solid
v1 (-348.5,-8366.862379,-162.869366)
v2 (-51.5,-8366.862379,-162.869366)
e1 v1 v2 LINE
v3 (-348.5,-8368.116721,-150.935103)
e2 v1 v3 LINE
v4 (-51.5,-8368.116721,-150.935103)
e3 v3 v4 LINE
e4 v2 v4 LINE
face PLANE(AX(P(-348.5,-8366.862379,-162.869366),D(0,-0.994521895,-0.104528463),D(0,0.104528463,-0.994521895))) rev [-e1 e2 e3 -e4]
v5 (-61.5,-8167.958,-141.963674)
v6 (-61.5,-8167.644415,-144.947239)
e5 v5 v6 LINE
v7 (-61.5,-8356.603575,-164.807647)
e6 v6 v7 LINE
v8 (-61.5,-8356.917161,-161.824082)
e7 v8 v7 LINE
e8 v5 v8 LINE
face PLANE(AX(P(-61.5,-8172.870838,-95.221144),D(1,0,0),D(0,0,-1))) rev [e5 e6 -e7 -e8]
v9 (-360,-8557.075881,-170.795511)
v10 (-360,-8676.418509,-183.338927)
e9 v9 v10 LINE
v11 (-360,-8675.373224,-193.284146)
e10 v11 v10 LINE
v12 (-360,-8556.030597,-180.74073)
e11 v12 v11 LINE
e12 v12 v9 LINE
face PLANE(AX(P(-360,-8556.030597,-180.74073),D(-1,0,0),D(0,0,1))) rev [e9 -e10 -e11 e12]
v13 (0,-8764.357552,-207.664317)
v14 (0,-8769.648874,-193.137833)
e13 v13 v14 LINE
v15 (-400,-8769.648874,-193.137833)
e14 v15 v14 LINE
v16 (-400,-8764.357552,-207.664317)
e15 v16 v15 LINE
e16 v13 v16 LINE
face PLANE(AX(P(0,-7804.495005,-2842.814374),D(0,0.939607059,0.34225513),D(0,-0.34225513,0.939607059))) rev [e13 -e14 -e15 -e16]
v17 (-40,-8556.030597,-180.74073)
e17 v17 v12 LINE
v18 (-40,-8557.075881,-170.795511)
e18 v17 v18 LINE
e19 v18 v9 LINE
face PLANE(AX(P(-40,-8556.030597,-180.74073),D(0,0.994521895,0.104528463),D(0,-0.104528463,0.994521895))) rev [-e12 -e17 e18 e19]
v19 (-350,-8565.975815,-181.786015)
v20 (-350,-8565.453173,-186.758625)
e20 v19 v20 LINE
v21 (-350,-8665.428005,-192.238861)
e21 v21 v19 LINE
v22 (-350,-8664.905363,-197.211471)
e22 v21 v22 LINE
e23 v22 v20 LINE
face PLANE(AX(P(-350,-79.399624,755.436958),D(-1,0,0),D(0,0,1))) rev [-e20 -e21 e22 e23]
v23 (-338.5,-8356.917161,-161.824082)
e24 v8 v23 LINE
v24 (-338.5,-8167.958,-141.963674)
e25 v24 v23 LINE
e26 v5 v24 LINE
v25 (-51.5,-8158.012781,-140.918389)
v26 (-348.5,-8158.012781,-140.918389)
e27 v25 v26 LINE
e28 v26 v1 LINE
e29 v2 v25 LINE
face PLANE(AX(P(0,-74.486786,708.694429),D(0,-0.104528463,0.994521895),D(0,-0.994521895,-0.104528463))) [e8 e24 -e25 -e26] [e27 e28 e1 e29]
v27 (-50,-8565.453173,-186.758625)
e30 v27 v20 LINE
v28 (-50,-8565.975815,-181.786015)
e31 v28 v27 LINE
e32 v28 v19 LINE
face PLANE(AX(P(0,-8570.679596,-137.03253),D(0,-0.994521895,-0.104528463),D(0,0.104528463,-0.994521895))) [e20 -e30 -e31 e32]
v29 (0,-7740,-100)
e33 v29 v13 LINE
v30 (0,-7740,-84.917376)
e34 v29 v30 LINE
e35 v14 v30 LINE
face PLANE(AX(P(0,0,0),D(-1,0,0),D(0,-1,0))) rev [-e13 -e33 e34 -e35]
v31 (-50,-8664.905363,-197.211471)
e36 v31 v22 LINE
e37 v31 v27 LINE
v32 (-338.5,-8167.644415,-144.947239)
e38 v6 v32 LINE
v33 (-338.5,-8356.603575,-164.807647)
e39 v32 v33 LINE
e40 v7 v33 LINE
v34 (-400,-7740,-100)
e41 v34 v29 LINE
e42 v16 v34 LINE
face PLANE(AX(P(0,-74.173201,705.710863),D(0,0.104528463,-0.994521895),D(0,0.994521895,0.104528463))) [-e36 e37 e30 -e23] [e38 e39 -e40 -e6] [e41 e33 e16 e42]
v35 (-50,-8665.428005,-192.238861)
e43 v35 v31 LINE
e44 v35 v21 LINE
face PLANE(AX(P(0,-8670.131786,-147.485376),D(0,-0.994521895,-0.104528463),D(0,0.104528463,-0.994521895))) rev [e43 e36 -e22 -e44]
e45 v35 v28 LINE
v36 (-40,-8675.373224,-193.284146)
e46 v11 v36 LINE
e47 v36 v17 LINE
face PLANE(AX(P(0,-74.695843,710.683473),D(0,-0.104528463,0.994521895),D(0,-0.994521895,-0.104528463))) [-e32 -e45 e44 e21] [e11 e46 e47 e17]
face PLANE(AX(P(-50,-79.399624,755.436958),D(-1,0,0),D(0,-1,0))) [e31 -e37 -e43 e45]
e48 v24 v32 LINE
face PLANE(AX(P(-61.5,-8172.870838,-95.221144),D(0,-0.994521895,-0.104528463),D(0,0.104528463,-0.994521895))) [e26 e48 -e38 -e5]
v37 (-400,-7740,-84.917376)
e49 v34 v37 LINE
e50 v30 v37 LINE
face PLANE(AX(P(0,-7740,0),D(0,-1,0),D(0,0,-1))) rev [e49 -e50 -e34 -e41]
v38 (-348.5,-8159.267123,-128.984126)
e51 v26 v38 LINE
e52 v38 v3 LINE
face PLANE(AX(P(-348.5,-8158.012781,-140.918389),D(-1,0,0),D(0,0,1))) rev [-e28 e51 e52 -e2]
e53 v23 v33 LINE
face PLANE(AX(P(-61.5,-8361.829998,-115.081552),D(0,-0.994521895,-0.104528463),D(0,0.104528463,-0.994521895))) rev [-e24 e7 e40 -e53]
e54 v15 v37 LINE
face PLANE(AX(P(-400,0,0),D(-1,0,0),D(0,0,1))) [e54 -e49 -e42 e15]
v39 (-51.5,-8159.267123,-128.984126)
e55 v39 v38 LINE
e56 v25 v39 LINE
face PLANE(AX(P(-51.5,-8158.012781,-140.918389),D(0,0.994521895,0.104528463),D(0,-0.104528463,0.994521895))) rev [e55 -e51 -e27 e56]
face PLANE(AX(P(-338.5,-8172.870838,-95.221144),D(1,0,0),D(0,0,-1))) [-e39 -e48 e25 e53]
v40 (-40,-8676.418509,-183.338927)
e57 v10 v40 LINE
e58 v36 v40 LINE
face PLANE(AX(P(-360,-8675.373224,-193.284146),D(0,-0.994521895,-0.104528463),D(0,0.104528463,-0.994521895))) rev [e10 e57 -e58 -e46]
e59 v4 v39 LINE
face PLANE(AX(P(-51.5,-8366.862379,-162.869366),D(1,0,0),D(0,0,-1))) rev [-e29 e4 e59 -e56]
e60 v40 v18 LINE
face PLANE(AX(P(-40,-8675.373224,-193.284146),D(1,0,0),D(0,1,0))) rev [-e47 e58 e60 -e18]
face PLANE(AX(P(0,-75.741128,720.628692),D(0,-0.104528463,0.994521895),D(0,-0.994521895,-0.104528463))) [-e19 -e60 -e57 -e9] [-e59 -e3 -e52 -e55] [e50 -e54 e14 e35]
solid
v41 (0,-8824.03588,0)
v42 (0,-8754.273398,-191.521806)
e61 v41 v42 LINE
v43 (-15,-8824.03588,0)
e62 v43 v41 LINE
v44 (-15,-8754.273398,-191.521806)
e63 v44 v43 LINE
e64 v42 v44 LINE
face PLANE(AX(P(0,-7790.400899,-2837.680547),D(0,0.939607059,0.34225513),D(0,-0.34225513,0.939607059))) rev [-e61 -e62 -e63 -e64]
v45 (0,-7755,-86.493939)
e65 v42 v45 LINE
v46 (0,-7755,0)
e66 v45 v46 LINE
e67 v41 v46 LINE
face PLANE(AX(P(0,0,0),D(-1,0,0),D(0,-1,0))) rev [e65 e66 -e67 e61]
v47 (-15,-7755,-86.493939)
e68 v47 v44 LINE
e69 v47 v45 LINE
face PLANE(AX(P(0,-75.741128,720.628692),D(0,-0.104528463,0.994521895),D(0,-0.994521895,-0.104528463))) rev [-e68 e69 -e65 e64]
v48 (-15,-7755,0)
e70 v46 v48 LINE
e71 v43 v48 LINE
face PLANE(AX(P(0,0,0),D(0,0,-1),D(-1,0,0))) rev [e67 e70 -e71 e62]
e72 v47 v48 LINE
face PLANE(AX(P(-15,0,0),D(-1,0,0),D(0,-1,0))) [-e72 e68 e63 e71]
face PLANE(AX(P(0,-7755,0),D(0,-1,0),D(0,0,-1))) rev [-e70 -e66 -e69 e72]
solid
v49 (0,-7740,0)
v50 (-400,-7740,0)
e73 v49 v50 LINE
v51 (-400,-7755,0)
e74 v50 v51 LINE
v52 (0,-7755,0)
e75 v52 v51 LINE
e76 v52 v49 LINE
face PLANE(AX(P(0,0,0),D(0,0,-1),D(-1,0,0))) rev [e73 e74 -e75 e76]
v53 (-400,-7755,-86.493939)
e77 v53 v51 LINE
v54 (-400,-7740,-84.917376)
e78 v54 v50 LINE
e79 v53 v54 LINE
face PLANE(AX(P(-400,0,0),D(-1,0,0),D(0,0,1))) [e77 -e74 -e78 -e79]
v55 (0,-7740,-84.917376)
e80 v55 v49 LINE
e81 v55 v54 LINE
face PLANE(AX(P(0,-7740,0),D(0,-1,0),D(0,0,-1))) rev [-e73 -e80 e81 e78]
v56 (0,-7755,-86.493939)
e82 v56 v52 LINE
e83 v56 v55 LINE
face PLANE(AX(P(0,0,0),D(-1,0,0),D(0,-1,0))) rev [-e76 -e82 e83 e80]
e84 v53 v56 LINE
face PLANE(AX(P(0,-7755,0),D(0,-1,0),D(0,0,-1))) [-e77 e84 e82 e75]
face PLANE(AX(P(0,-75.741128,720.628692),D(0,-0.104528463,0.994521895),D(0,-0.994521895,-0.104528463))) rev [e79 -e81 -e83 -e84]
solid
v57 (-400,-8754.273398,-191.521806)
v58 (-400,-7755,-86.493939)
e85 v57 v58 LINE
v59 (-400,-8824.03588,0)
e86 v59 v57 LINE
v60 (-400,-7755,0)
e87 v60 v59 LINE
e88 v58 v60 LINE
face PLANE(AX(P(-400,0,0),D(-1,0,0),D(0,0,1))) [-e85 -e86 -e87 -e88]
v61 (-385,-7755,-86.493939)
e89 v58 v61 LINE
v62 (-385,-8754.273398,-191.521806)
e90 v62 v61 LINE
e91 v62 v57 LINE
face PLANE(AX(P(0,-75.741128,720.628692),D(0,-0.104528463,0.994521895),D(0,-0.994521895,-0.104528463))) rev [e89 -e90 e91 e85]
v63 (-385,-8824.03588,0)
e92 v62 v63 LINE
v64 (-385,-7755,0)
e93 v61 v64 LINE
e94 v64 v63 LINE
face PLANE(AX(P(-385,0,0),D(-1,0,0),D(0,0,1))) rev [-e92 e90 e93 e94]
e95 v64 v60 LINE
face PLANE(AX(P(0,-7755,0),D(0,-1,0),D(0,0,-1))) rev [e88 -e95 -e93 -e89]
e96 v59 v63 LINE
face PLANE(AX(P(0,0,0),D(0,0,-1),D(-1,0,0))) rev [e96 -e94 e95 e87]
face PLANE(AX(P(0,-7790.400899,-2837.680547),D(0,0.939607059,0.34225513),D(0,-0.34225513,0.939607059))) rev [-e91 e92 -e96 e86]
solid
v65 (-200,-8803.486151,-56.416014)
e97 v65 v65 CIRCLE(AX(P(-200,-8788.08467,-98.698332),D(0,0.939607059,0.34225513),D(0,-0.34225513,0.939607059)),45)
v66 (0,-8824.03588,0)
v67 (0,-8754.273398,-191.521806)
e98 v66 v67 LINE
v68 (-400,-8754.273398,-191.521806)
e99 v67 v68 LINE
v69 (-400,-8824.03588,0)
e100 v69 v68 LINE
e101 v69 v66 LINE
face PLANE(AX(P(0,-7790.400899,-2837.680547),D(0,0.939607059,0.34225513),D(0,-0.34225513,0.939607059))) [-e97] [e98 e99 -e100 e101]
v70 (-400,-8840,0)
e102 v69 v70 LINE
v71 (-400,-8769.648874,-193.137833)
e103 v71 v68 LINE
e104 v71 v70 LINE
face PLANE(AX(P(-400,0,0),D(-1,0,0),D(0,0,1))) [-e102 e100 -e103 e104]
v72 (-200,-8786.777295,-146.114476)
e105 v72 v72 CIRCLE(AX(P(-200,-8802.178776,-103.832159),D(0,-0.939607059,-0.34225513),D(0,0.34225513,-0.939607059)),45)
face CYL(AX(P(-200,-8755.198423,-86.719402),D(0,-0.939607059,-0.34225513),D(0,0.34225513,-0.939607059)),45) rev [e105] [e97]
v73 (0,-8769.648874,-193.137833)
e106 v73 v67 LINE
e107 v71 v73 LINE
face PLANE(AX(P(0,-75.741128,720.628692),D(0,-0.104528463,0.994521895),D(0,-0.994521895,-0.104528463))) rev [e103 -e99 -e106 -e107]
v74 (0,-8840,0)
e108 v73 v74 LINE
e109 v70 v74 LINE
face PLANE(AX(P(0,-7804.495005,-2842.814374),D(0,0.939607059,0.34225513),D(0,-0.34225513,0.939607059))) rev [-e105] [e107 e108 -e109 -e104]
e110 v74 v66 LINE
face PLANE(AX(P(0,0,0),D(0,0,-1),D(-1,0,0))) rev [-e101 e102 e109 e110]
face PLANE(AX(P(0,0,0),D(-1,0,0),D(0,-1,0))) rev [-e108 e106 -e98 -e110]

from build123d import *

# Parameters (mm, degrees)
SKETCH6_W          = 300
SKETCH6_H          = 100
SKETCH6_W_2        = 277
SKETCH6_H_2        = 190
CUT_EXTRUDE1_DEPTH = 50
SHELL1_T           = -15
SKETCH7_R          = 45
CUT_EXTRUDE2_DEPTH = 50
SPLIT3_START       = -400
SPLIT3_DEPTH       = 154.9999999
SPLIT3_START_2     = -154.9999999
SPLIT3_2_DEPTH     = 154.9999999
SPLIT3_START_3     = -245.0000001
SPLIT3_3_DEPTH     = 90.0000002
SPLIT3_START_4     = -8306.126404087
SPLIT3_4_OUTLINE_R = 45
SPLIT3_4_DEPTH     = 15
SPLIT3_5_DEPTH     = 385
SPLIT3_6_DEPTH     = 155.9999999
SPLIT3_7_DEPTH     = 15
SPLIT3_8_DEPTH     = 400
SKETCH9_W          = 297
SKETCH9_H          = 210
CUT_EXTRUDE3_DEPTH = 12
SKETCH10_W         = 320
SKETCH10_H         = 120
CUT_EXTRUDE4_DEPTH = 10


with BuildPart() as part:
    # Sketch4 → Loft1 section 0
    with BuildSketch(Plane(origin=(0, -74.173200619, 705.710863428), x_dir=(1, 0, 0), z_dir=(0, 0.10452846326765355, -0.9945218953682733))):
        with BuildLine():
            Line((0, 7708.052316477), (-400, 7708.052316477))
            Line((-400, 7708.052316477), (-400, 8738.052316477))
            Line((-400, 8738.052316477), (0, 8738.052316477))
            Line((0, 8738.052316477), (0, 7708.052316477))
        make_face()
    # Sketch2 → Loft1 section 1
    with BuildSketch(Plane.XY):
        with BuildLine():
            Line((0, -7740), (-400, -7740))
            Line((-400, -7740), (-400, -8840))
            Line((-400, -8840), (0, -8840))
            Line((0, -8840), (0, -7740))
        make_face()
    loft()

    # Sketch6 → Cut-Extrude1 (cut)
    with BuildSketch(Plane(origin=(0, -74.173200619, 705.710863428), x_dir=(-1, 0, 0), z_dir=(0, 0.1045284632676537, -0.9945218953682733))):
        with Locations((200, -8588.052316477)):
            Rectangle(SKETCH6_W, SKETCH6_H)
        with Locations((200, -8233.052316477)):
            Rectangle(SKETCH6_W_2, SKETCH6_H_2)
    extrude(amount=-CUT_EXTRUDE1_DEPTH, mode=Mode.SUBTRACT)

    # Shell1
    shell1_openings = [part.faces().sort_by_distance(p)[0] for p in [
        (-200, -8290, 0),
        (-200, -8667.518574274, -172.348423455),
        (-350, -8617.792479506, -167.122000291),
        (-200, -8568.066384737, -161.895577128),
        (-50, -8617.792479506, -167.122000291),
        (-61.5, -8264.73720665, -130.014395831),
        (-200, -8359.21678671, -139.944599842),
        (-338.5, -8264.73720665, -130.014395831),
        (-200, -8170.25762659, -120.084191821),
        (-200, -8620.405691087, -142.258952907),
        (-200, -8267.350418232, -105.151348447),
    ]]
    offset(amount=SHELL1_T, openings=shell1_openings, kind=Kind.INTERSECTION)

    # Sketch7 → Cut-Extrude2 (cut)
    with BuildSketch(Plane(origin=(0, -7804.495004601, -2842.814373791), x_dir=(1, 0, 0), z_dir=(0, -0.9396070592858664, -0.3422551301882362))):
        with Locations(Location((-200, 2915.029413774, 0), (0, 0, 270))):
            Circle(SKETCH7_R)
    extrude(amount=-CUT_EXTRUDE2_DEPTH, mode=Mode.SUBTRACT)


with BuildPart() as body_2:
    # Split2: the piece on the far side of the plane
    add(part.part)
    split(bisect_by=Plane(origin=(0, -75.741127568, 720.628691859), x_dir=(0, 0.9945218953682734, 0.1045284632676536), z_dir=(0, -0.1045284632676536, 0.9945218953682734)), keep=Keep.BOTTOM)

    # Sketch9 → Cut-Extrude3 (cut)
    with BuildSketch(Plane(origin=(0, -75.741127568, 720.628691859), x_dir=(1, 0, 0), z_dir=(0, -0.1045284632676536, 0.9945218953682734))):
        with Locations((-200, -8233.052316477)):
            Rectangle(SKETCH9_W, SKETCH9_H)
    extrude(amount=-CUT_EXTRUDE3_DEPTH, mode=Mode.SUBTRACT)

    # Sketch10 → Cut-Extrude4 (cut)
    with BuildSketch(Plane(origin=(0, -75.741127568, 720.628691859), x_dir=(1, 0, 0), z_dir=(0, -0.1045284632676536, 0.9945218953682734))):
        with Locations((-200, -8588.052316477)):
            Rectangle(SKETCH10_W, SKETCH10_H)
    extrude(amount=-CUT_EXTRUDE4_DEPTH, mode=Mode.SUBTRACT)


with BuildPart() as part_1:
    add(part.part)

    # Split2
    split(bisect_by=Plane(origin=(0, -75.741127568, 720.628691859), x_dir=(0, 0.9945218953682734, 0.1045284632676536), z_dir=(0, -0.1045284632676536, 0.9945218953682734)), keep=Keep.TOP)

    # Split3 5 outline → Split3 5 (cut)
    with BuildSketch(Plane.YZ.offset(SPLIT3_START)):
        Polygon((-8769.648874346, -193.137833337), (-7740, -84.917375807), (-7740, 0), (-8840, 0), align=None)
    extrude(amount=SPLIT3_5_DEPTH, mode=Mode.SUBTRACT)

    # Split3 6 outline → Split3 6 (cut)
    with BuildSketch(Plane.YZ.offset(SPLIT3_START_2)):
        Polygon((-8769.648874346, -193.137833337), (-8754.273397877, -191.521805641), (-8824.035879838, 0), (-8840, 0), align=None)
        Polygon((-7755, 0), (-7755, -86.493939336), (-7740, -84.917375807), (-7740, 0), align=None)
    extrude(amount=SPLIT3_6_DEPTH, mode=Mode.SUBTRACT)


with BuildPart() as body_3:
    # Split3: read off the stored shape, not the designer's step
    # Split3 outline → Split3 (new body)
    with BuildSketch(Plane.YZ.offset(SPLIT3_START)):
        Polygon((-8769.648874346, -193.137833337), (-8754.273397877, -191.521805641), (-8824.035879838, 0), (-8840, 0), align=None)
    extrude(amount=SPLIT3_DEPTH)

    # Split3 2 outline → Split3 2 (add)
    with BuildSketch(Plane.YZ.offset(SPLIT3_START_2)):
        Polygon((-8769.648874346, -193.137833337), (-8754.273397877, -191.521805641), (-8824.035879838, 0), (-8840, 0), align=None)
    extrude(amount=SPLIT3_2_DEPTH)

    # Split3 3 outline → Split3 3 (add)
    with BuildSketch(Plane.YZ.offset(SPLIT3_START_3)):
        Polygon((-8769.648874346, -193.137833337), (-8754.273397877, -191.521805641), (-8824.035879838, 0), (-8840, 0), align=None)
    extrude(amount=SPLIT3_3_DEPTH)

    # Split3 4 outline → Split3 4 (cut)
    with BuildSketch(Plane(origin=(0, 0, 0), x_dir=(1, 0, 0), z_dir=(0, 0.9396070592858664, 0.34225513018823617)).offset(SPLIT3_START_4)):
        with Locations((-200, -2915.029413774)):
            Circle(SPLIT3_4_OUTLINE_R)
    extrude(amount=SPLIT3_4_DEPTH, mode=Mode.SUBTRACT)


with BuildPart() as body_4:
    # Split3 7 outline → Split3 7 (new body)
    with BuildSketch(Plane.YZ.offset(SPLIT3_START)):
        Polygon((-8824.035879838, 0), (-8754.273397877, -191.521805641), (-7755, -86.493939336), (-7755, 0), align=None)
    extrude(amount=SPLIT3_7_DEPTH)


with BuildPart() as body_5:
    # Split3 8 outline → Split3 8 (new body)
    with BuildSketch(Plane.YZ.offset(SPLIT3_START)):
        Polygon((-7740, 0), (-7755, 0), (-7755, -86.493939336), (-7740, -84.917375807), align=None)
    extrude(amount=SPLIT3_8_DEPTH)


solid = Compound([body_2.part, part_1.part, body_3.part, body_4.part, body_5.part])
